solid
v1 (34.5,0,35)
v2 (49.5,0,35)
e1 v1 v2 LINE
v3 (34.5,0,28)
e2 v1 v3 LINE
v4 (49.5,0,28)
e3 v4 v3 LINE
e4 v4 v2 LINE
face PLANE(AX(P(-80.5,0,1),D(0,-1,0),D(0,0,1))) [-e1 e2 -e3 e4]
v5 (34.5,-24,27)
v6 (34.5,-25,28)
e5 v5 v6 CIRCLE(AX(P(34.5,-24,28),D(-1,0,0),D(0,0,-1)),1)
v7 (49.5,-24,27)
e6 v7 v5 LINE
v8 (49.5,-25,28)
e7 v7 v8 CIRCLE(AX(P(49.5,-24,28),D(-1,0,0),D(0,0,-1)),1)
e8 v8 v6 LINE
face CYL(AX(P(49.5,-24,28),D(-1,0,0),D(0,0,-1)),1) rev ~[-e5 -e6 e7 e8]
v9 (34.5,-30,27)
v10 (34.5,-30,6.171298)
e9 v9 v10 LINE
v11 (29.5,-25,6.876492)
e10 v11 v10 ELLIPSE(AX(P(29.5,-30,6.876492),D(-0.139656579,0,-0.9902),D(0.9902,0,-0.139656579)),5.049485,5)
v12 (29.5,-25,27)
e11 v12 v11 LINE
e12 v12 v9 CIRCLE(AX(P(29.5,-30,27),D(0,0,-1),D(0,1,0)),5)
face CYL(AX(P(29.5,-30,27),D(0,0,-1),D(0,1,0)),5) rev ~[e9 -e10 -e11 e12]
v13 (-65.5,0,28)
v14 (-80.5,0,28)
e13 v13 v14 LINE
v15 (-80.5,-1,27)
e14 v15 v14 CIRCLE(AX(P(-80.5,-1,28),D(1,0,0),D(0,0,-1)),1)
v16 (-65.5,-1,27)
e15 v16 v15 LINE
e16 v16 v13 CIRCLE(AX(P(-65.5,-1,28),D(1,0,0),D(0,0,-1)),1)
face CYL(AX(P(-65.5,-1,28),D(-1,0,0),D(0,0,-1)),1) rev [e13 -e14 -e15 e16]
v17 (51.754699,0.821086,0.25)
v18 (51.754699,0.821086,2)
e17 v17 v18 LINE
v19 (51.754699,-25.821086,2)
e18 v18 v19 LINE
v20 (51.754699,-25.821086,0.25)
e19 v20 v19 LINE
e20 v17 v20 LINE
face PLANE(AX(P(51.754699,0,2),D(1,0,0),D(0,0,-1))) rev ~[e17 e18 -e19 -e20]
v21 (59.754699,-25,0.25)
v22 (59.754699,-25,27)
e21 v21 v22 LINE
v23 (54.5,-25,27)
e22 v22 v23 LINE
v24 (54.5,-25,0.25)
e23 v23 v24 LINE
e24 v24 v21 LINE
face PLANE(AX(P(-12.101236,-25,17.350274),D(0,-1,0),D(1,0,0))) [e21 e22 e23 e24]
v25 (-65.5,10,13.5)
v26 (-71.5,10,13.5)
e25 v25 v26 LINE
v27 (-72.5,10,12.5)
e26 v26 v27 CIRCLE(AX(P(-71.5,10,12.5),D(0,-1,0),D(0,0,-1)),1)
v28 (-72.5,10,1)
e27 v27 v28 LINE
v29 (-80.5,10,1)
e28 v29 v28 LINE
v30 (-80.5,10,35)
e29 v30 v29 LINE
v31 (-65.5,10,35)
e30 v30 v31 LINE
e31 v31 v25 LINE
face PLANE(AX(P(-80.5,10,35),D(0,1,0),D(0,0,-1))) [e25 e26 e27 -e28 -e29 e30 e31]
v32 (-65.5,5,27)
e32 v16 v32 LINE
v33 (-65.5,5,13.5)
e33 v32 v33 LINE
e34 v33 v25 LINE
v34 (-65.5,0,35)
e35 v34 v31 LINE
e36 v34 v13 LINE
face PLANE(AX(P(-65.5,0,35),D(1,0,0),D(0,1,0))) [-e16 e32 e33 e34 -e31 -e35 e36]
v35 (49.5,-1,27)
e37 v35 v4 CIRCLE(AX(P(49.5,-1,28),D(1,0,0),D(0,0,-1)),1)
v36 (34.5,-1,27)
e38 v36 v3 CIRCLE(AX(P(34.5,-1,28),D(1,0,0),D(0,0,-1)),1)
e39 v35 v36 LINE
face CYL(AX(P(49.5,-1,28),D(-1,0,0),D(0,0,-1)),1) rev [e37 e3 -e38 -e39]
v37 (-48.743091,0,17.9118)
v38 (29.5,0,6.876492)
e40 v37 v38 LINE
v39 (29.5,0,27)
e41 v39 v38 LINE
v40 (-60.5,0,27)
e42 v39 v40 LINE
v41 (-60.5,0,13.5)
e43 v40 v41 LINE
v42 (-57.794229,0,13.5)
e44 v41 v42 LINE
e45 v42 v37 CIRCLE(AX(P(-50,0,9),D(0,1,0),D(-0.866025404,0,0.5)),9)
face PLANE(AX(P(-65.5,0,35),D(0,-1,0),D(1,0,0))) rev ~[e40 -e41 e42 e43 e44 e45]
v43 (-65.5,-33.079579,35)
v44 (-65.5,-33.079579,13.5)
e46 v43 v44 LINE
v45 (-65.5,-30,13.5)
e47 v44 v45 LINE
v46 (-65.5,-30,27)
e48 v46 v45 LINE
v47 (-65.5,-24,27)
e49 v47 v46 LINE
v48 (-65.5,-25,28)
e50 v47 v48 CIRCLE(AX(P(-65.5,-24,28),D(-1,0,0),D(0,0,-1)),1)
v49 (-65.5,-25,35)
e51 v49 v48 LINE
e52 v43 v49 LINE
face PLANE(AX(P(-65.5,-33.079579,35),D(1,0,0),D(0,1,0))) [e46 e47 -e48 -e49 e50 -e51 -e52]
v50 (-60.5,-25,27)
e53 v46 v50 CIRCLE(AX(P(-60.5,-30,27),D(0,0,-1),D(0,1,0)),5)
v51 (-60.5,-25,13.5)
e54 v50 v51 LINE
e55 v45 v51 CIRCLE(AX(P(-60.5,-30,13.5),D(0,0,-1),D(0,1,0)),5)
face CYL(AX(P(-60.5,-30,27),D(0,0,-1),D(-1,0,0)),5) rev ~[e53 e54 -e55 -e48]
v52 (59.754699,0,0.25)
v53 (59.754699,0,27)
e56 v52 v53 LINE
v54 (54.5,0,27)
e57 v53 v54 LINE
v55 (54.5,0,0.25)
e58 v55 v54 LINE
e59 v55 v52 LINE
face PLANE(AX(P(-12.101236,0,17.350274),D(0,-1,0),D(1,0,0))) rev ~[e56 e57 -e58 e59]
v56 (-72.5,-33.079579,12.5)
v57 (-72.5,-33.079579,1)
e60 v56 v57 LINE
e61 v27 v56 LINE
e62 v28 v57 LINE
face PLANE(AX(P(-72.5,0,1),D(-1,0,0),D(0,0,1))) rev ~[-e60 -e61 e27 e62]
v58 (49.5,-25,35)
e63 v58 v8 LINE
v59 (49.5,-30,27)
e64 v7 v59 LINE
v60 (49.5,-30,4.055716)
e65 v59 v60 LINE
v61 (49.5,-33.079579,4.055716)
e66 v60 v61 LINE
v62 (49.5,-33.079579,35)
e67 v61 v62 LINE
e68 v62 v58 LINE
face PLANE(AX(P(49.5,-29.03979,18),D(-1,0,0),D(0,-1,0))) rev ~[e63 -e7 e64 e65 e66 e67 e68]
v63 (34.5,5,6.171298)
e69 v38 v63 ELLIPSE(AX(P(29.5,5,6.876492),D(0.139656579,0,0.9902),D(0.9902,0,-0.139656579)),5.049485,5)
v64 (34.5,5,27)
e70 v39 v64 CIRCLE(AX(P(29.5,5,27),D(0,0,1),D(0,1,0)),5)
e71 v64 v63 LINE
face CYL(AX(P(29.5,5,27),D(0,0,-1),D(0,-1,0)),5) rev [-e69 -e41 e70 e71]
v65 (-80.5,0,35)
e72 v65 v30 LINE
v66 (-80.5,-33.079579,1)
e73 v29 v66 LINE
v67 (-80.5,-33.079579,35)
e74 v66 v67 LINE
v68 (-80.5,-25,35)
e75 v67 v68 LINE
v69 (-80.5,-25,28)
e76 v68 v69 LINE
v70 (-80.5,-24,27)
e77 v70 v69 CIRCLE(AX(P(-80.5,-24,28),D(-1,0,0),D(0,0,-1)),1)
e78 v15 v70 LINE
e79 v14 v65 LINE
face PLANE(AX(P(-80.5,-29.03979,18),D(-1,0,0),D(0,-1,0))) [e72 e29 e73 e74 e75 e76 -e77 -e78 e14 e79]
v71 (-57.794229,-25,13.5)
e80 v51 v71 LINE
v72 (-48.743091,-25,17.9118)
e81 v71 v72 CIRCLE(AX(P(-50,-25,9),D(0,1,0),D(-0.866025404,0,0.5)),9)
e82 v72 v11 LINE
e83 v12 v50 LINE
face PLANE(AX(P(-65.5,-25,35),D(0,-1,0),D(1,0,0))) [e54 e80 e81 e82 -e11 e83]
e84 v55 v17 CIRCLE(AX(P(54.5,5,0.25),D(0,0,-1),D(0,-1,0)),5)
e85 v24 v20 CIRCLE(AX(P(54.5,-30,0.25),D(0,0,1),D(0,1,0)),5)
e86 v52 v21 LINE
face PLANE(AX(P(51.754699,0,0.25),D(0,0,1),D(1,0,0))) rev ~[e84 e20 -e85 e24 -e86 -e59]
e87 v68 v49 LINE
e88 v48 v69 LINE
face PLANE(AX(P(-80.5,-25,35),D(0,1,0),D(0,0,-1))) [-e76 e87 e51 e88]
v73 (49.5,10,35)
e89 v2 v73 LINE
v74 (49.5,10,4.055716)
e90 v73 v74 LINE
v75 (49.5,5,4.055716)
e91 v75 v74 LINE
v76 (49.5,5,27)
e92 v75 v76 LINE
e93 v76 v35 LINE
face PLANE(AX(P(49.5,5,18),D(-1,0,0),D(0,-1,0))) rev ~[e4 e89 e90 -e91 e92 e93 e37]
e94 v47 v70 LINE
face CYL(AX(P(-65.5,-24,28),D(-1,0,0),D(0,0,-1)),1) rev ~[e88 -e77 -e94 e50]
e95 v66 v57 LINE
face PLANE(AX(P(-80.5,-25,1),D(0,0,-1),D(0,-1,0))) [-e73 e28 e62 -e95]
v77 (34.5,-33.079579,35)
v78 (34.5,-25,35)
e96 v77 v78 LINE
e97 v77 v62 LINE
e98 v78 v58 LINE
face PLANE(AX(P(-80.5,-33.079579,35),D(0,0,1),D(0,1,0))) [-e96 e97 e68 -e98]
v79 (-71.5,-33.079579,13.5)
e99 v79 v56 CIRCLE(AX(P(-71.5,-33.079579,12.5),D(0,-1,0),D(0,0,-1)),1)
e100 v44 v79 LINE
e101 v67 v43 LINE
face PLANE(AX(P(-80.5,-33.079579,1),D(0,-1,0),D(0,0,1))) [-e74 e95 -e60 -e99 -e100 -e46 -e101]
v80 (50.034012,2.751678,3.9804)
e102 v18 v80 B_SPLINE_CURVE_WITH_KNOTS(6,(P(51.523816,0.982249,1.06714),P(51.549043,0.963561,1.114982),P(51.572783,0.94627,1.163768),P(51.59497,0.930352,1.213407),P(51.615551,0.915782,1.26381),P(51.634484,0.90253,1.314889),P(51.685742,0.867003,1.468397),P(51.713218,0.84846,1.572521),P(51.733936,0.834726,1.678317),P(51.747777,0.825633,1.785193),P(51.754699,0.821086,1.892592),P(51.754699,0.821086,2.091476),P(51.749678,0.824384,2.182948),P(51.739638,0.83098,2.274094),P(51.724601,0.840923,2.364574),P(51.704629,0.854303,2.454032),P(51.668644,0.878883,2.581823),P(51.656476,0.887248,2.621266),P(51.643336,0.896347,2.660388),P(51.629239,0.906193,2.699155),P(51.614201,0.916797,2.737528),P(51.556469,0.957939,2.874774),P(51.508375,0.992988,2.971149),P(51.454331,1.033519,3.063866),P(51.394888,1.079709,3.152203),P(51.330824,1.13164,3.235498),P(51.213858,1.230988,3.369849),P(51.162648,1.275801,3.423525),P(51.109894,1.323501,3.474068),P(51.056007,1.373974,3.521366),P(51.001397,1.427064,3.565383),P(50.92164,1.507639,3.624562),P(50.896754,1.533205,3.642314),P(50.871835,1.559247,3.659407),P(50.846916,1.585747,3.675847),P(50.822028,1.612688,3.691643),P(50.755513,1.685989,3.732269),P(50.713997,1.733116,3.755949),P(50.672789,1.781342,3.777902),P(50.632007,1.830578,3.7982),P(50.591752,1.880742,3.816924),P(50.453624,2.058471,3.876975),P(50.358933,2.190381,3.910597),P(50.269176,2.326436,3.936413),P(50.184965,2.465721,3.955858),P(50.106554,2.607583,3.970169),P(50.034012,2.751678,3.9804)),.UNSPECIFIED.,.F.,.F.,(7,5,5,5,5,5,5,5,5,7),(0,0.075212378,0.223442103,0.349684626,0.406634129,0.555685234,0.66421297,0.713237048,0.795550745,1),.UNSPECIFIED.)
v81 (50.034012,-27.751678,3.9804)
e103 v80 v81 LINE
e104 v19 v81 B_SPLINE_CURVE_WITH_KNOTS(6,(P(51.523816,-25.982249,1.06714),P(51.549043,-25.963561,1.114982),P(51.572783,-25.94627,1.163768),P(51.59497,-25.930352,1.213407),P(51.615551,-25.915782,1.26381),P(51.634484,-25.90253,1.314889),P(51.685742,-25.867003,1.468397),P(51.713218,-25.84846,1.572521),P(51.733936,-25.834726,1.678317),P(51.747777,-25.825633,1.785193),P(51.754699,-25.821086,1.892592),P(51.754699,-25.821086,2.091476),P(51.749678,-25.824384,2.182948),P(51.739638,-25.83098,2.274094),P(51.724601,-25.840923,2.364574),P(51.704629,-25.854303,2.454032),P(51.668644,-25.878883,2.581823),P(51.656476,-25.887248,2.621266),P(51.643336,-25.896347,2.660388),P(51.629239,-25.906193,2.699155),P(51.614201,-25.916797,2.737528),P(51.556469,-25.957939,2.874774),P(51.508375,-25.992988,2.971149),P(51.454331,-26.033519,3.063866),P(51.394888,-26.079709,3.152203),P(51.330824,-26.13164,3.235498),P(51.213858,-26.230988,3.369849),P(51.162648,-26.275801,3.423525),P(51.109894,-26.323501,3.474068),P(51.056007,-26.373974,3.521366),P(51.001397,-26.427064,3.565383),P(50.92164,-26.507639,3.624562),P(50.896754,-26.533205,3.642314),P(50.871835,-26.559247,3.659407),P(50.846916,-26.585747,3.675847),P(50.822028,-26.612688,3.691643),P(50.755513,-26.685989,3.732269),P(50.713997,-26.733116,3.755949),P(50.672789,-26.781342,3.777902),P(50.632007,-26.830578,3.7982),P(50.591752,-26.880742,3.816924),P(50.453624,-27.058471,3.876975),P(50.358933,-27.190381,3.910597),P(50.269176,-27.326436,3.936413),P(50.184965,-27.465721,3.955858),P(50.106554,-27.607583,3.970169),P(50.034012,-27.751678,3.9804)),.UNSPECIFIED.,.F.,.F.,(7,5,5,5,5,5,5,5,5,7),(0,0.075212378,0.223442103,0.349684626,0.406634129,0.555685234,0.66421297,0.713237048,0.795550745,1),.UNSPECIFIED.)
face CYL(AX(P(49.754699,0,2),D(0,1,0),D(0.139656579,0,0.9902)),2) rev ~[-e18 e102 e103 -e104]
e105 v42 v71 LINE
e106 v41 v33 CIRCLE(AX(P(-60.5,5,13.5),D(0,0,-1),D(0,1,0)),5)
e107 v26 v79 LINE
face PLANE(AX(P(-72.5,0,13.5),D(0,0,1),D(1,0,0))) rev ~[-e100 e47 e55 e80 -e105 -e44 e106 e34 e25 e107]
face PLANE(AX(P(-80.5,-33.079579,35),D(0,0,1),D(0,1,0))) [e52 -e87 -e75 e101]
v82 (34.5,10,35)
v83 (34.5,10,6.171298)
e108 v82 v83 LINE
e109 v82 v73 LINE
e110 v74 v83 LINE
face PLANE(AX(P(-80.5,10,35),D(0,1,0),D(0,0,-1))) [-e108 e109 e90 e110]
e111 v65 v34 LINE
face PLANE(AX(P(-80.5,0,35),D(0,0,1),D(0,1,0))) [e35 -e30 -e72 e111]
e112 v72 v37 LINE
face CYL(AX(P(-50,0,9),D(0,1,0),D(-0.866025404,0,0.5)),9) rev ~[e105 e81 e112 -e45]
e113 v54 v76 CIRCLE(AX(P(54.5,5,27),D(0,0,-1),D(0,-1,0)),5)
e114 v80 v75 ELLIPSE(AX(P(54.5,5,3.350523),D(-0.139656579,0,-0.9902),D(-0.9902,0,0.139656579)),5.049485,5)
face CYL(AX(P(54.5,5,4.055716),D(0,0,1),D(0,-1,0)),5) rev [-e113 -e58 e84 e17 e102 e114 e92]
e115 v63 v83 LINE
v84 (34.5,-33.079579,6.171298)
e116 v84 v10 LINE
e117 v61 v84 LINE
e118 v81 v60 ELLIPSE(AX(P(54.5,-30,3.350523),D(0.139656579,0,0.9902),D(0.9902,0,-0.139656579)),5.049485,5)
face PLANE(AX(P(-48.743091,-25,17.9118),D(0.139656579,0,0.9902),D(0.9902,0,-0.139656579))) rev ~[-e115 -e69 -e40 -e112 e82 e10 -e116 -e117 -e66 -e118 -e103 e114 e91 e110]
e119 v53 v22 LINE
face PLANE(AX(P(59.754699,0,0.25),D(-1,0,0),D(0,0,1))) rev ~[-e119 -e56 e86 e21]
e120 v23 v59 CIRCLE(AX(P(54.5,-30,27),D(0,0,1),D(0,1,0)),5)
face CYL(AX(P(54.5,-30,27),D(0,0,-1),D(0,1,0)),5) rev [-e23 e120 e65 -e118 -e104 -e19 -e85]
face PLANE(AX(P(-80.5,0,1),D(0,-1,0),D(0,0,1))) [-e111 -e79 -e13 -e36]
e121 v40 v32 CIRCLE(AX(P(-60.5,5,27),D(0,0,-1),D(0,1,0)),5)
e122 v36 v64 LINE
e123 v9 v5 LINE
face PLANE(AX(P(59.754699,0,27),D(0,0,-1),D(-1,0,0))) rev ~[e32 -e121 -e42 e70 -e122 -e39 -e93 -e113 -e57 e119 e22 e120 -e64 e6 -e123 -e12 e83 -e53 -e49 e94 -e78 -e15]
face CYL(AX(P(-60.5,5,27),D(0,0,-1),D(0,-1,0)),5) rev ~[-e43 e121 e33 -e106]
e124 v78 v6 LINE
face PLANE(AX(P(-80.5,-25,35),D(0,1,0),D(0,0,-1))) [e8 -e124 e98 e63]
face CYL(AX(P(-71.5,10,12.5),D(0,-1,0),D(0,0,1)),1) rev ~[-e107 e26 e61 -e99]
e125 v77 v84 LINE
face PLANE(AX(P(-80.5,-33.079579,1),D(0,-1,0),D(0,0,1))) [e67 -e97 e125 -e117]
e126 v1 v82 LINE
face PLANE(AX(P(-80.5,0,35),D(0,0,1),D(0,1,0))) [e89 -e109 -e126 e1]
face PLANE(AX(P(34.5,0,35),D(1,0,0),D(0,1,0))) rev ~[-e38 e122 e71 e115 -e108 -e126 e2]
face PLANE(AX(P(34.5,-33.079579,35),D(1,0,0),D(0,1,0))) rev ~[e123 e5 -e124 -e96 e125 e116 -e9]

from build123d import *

# Parameters (mm, degrees)
F1_DEPTH  = 25
F3_DEPTH  = 130
F4_DEPTH  = 25
F5_R      = 5
F7_DEPTH  = 130
F8_DEPTH  = 25
F9_R      = 5
F10_R     = 1
F11_W     = 100
F11_H     = 10
F12_DEPTH = 35
F13_W     = 100
F13_H     = 8.0795794725
F14_DEPTH = 35
F15_R     = 5
F16_R     = 1


with BuildPart() as f1:
    # F0 (on Front) → F1 (new body)
    with BuildSketch(Plane.XZ):
        with BuildLine():
            ThreePointArc((-57.7942286341, 13.5), (-53.9433654568, 17.090109324), (-48.7430907909, 17.9118))
            Line((-48.7430907909, 17.9118), (50.034012295, 3.9804))
            ThreePointArc((50.034012295, 3.9804), (51.2644385711, 3.3117495349), (51.7546991374, 2))
            Line((51.7546991374, 2), (51.7546991374, 0.25))
            Line((51.7546991374, 0.25), (59.7546991374, 0.25))
            Line((59.7546991374, 0.25), (59.7546991374, 27))
            Line((59.7546991374, 27), (-80.5, 27))
            Line((-80.5, 27), (-80.5, 1))
            Line((-80.5, 1), (-72.5, 1))
            Line((-72.5, 1), (-72.5, 13.5))
            Line((-72.5, 13.5), (-57.7942286341, 13.5))
        make_face()
    extrude(amount=F1_DEPTH)

    # F2 (on face) → F3 (join)
    with BuildSketch(Plane(origin=(-80.5, 0, 0), x_dir=(0, -1, 0), z_dir=(-1, 0, 0))):
        Polygon((0, 1), (0, 27), (0, 35), (-10, 35), (-10, 1), align=None)
    extrude(amount=-F3_DEPTH)

    # F4 (cut): a face of the model
    f4_faces = [f1.faces().sort_by_distance(p)[0] for p in [
        (-23.2155862484, 0, 7.0978499246),
    ]]
    extrude(f4_faces, amount=-F4_DEPTH, mode=Mode.SUBTRACT)

    # F5
    f5_edges = [f1.edges().sort_by_distance(p)[0] for p in [
        (49.5, 0, 15.527858),
    ]]
    fillet(f5_edges, radius=F5_R)

    # F6 (on face) → F7 (join)
    with BuildSketch(Plane(origin=(-80.5, 0, 0), x_dir=(0, -1, 0), z_dir=(-1, 0, 0))):
        Polygon((25, 35), (25, 27), (25, 1), (33.0795794725, 1), (33.0795794725, 35), align=None)
    extrude(amount=-F7_DEPTH)

    # F8 (cut): a face of the model
    f8_faces = [f1.faces().sort_by_distance(p)[0] for p in [
        (-23.2155862484, -25, 7.0978499246),
    ]]
    extrude(f8_faces, amount=-F8_DEPTH, mode=Mode.SUBTRACT)

    # F9
    f9_edges = [f1.edges().sort_by_distance(p)[0] for p in [
        (49.5, -25, 15.527858),
    ]]
    fillet(f9_edges, radius=F9_R)

    # F10
    f10_edges = [f1.edges().sort_by_distance(p)[0] for p in [
        (-72.5, -11.53979, 13.5),
    ]]
    fillet(f10_edges, radius=F10_R)

    # F11 (on face) → F12 (cut)
    with BuildSketch(Plane.XY.offset(35)):
        with Locations((-15.5, 5)):
            Rectangle(F11_W, F11_H)
    extrude(amount=-F12_DEPTH, mode=Mode.SUBTRACT)

    # F13 (on face) → F14 (cut)
    with BuildSketch(Plane.XY.offset(35)):
        with Locations((-15.5, -29.0397897363)):
            Rectangle(F13_W, F13_H)
    extrude(amount=-F14_DEPTH, mode=Mode.SUBTRACT)

    # F15
    f15_edges = [f1.edges().sort_by_distance(p)[0] for p in [
        (-65.5, -25, 20.25),
        (-65.5, 0, 20.25),
        (34.5, 0, 16.585649),
        (34.5, -25, 16.585649),
    ]]
    fillet(f15_edges, radius=F15_R)

    # F16
    f16_edges = [f1.edges().sort_by_distance(p)[0] for p in [
        (42, -25, 27),
        (-73, -25, 27),
        (-73, 0, 27),
        (42, 0, 27),
    ]]
    fillet(f16_edges, radius=F16_R)


solid = f1.part
